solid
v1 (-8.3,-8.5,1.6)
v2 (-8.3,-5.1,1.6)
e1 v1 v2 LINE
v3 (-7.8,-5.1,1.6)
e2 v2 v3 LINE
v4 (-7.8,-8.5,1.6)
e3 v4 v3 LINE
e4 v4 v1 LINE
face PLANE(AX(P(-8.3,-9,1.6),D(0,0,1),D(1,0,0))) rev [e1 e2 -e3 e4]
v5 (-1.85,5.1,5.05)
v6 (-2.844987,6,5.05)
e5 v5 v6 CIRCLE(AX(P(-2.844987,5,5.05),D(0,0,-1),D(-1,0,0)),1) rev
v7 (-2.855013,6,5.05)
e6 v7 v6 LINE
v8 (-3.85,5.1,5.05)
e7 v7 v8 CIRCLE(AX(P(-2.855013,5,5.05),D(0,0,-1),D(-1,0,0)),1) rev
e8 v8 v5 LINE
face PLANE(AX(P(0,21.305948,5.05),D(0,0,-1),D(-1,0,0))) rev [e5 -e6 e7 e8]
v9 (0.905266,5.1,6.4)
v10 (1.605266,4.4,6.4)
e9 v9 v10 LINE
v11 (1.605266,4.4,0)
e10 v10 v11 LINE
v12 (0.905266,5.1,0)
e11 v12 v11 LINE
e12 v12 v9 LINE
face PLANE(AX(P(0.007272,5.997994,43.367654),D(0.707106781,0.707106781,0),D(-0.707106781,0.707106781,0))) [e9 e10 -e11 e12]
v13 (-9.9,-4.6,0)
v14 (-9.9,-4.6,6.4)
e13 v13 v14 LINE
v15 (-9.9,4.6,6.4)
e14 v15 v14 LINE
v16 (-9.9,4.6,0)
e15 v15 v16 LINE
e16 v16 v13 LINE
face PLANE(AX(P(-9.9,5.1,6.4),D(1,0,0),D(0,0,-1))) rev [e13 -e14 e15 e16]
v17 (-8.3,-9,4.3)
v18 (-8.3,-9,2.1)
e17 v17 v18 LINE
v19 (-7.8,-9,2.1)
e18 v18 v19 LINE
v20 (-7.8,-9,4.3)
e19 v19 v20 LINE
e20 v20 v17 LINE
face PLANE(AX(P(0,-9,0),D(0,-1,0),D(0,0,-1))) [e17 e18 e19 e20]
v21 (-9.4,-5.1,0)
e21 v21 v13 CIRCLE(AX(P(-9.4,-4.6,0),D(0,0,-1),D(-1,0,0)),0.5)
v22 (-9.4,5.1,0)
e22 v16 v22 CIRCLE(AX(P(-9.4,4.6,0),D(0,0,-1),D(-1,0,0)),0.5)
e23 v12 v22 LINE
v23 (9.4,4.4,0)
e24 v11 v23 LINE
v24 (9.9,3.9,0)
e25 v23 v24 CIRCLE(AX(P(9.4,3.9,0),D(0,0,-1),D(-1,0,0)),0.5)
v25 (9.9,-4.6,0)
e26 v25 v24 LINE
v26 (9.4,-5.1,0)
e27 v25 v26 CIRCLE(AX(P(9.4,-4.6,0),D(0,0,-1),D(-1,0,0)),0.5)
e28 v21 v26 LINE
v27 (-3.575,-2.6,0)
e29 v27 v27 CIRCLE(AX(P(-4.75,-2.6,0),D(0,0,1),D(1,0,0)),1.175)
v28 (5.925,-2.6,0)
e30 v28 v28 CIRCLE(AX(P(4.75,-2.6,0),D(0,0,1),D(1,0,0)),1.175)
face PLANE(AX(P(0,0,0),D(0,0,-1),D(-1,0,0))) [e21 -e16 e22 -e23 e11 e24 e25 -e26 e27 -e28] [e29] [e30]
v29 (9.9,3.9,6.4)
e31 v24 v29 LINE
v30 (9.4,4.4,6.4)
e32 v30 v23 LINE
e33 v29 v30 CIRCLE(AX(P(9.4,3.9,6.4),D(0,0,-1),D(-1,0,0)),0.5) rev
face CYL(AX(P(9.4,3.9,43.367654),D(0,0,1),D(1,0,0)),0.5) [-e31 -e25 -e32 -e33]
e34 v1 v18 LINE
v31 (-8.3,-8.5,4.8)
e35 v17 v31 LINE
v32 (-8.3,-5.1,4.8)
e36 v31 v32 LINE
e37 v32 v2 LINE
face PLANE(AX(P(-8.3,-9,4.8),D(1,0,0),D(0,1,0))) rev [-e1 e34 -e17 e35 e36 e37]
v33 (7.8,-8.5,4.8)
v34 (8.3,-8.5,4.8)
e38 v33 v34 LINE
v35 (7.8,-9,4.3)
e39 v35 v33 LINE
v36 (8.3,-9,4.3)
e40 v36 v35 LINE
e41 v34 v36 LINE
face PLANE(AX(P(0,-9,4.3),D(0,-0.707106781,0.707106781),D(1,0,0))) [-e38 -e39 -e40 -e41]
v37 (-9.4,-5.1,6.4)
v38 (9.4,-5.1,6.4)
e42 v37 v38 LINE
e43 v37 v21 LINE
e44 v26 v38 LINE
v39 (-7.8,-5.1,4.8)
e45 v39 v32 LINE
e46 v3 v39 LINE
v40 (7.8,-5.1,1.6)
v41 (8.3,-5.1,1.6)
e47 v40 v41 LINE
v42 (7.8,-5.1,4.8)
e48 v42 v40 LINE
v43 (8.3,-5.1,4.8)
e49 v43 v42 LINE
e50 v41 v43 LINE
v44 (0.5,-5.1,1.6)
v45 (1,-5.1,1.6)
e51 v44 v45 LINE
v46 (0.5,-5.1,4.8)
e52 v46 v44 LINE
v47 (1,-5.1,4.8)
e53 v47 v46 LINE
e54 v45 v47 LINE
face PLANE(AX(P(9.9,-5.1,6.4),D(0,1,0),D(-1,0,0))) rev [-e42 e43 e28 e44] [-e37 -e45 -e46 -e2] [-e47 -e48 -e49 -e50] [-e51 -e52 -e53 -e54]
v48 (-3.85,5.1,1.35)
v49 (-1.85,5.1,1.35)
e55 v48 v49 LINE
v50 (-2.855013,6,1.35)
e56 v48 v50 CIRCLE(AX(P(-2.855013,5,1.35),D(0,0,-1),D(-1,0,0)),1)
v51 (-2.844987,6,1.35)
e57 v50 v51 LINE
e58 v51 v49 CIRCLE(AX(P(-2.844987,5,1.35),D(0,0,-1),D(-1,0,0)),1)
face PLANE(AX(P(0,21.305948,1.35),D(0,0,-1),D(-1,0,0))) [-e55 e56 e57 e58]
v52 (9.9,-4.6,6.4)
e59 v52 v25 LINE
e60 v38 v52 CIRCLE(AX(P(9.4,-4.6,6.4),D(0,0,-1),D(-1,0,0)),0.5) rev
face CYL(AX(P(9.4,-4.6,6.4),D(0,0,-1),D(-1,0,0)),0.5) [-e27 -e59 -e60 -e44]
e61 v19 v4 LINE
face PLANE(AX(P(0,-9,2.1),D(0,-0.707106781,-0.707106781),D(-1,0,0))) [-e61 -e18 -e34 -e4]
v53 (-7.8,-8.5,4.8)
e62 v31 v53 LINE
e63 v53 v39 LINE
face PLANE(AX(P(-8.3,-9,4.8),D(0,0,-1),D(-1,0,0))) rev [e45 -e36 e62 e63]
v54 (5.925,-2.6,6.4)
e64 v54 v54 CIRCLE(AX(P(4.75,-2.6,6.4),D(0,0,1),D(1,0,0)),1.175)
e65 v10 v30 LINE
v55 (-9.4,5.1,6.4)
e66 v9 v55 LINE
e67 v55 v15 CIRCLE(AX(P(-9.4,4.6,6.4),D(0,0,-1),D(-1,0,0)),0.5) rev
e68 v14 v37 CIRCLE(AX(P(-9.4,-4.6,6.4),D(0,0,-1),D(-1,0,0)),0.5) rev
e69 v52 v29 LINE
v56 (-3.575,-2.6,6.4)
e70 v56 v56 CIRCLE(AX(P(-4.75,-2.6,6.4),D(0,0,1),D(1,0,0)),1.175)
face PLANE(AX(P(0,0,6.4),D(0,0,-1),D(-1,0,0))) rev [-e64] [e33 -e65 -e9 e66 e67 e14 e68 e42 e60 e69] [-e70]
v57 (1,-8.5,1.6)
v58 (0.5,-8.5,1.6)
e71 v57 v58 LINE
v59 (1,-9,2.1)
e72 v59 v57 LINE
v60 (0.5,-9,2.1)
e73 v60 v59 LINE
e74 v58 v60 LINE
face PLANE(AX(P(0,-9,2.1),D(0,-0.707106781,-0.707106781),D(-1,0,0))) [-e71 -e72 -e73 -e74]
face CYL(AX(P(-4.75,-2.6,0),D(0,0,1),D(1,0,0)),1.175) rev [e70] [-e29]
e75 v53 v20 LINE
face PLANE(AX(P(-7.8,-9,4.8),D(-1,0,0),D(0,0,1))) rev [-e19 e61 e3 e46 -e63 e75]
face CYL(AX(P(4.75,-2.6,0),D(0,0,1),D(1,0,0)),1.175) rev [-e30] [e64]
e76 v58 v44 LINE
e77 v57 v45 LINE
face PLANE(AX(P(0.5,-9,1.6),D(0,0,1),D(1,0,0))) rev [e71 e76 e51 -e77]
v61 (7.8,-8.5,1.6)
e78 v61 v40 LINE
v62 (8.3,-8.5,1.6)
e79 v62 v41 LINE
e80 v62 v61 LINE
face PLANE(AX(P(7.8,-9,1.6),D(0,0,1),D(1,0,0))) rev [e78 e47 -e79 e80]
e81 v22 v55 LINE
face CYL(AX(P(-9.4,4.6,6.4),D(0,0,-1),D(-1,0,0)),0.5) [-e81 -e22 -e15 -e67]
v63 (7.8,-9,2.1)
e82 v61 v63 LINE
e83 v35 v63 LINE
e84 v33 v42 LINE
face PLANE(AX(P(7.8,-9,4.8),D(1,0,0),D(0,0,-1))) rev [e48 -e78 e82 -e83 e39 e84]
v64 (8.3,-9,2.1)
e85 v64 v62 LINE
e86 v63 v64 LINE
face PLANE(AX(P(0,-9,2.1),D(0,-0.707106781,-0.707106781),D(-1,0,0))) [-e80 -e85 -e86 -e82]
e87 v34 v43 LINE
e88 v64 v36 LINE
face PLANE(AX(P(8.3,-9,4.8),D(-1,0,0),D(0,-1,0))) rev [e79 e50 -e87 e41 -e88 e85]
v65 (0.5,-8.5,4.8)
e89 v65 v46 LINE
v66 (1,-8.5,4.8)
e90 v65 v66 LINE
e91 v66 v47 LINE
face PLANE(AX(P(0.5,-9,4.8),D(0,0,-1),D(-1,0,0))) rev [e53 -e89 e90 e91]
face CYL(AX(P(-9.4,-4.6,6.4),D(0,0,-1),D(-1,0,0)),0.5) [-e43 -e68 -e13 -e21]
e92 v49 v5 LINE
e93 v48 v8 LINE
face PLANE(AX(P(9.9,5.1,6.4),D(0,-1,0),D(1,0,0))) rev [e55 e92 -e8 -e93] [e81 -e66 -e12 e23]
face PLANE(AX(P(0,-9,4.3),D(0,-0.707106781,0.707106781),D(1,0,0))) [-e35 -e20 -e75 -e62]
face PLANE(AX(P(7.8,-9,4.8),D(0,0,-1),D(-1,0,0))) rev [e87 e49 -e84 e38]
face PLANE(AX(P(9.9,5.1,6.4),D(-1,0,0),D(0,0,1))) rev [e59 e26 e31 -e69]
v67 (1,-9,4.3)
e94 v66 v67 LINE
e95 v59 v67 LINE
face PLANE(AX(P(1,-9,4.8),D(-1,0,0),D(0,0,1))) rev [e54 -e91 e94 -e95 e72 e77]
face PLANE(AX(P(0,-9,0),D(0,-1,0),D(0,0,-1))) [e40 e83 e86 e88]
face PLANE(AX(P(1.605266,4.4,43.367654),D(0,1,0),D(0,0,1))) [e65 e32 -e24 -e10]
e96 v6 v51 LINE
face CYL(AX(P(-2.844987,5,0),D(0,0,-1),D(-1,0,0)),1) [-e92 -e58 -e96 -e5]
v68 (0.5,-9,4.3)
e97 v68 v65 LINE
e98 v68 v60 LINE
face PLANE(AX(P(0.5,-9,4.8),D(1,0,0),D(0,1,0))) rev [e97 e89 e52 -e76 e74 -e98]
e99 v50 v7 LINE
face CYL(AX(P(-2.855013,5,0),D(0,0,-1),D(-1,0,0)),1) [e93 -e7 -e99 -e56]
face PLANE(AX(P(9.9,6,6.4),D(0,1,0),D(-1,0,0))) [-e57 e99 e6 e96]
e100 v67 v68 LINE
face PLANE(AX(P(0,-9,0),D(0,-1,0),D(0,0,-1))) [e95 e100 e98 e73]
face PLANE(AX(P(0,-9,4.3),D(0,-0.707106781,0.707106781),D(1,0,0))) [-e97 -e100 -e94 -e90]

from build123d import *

# Parameters (mm, degrees)
SKETCH_1_W               = 19.8
SKETCH_1_H               = 10.2
EXTRUDE_1_DEPTH          = 6.4
CUT_EXTRUDE_1_DEPTH      = 13.844454056
CUT_EXTRUDE_1_DEPTH_BACK = 13.844454056
SKETCH_3_R               = 1.175
CUT_EXTRUDE_2_DEPTH      = 13.844454056
SKETCH_4_W               = 2
SKETCH_4_H               = 3.7
EXTRUDE_2_DEPTH          = 0.9
FILLET_2_R               = 0.5
FILLET_3_R               = 1
SKETCH_6_W               = 0.5
SKETCH_6_H               = 3.2
EXTRUDE_3_DEPTH          = 3.9
CHAMFER_1_SIZE           = 0.5


with BuildPart() as part:
    # 草图1 → 凸台-拉伸1 (new body)
    with BuildSketch(Plane.XY):
        Rectangle(SKETCH_1_W, SKETCH_1_H)
    extrude(amount=EXTRUDE_1_DEPTH)

    # 草图2 → 切除-拉伸1 (cut, two sides: drawn at the far end of the back side and taken through both)
    with BuildSketch(Plane.XY.offset(6.4).offset(-CUT_EXTRUDE_1_DEPTH_BACK)):
        Polygon((9.9, 5.1), (0.905266145, 5.1), (1.605266145, 4.4), (9.9, 4.4), align=None)
    extrude(amount=CUT_EXTRUDE_1_DEPTH + CUT_EXTRUDE_1_DEPTH_BACK, mode=Mode.SUBTRACT)

    # 草图3 → 切除-拉伸2 (cut, through all)
    with BuildSketch(Plane.XY.offset(6.4)):
        with Locations((-4.75, -2.6)):
            Circle(SKETCH_3_R)
        with Locations((4.75, -2.6)):
            Circle(SKETCH_3_R)
    extrude(amount=-CUT_EXTRUDE_2_DEPTH, mode=Mode.SUBTRACT)

    # 草图4 → 凸台-拉伸2 (add)
    with BuildSketch(Plane(origin=(0, 5.1, 0), x_dir=(1, 0, 0), z_dir=(0, 1, 0))):
        with Locations((-2.85, -3.2)):
            Rectangle(SKETCH_4_W, SKETCH_4_H)
    extrude(amount=EXTRUDE_2_DEPTH)

    # 圆角2
    fillet_2_edges = [part.edges().sort_by_distance(p)[0] for p in [
        (9.9, 4.4, 3.2),
        (-9.9, 5.1, 3.2),
        (9.9, -5.1, 3.2),
        (-9.9, -5.1, 3.2),
    ]]
    fillet(fillet_2_edges, radius=FILLET_2_R)

    # 圆角3
    # the kernel refuses this fillet: 1 mm, written as the material it takes off along each edge
    with BuildSketch(Plane(origin=(-1.85, 6, -1.137468593), x_dir=(0, -1, 0), z_dir=(0, 0, 1)), Plane(origin=(-3.85, 6, 7.537468593), x_dir=(0, -1, 0), z_dir=(0, 0, -1))) as fillet_3_piece_1:
        with BuildLine():
            CenterArc((1, -0.994987437), FILLET_3_R, 95.739170477, 84.260829523)
            Line((0, -0.994987437), (-0.02, -0.994987437))
            Line((-0.02, -0.994987437), (-0.02, 0))
            Line((-0.02, 0), (0, 0.02))
            ThreePointArc((0, 0.02), (0.45, 0.02), (0.898, 0.019899749))
            Line((0.898, 0.019899749), (0.9, 0))
        make_face()
    extrude(amount=8.674937186, mode=Mode.SUBTRACT)

    # 草图6 → 凸台-拉伸3 (add)
    with BuildSketch(Plane.XZ.offset(5.1)):
        with Locations((-8.05, 3.2)):
            Rectangle(SKETCH_6_W, SKETCH_6_H)
        with Locations((0.75, 3.2)):
            Rectangle(SKETCH_6_W, SKETCH_6_H)
        with Locations((8.05, 3.2)):
            Rectangle(SKETCH_6_W, SKETCH_6_H)
    extrude(amount=EXTRUDE_3_DEPTH)

    # 倒角1
    chamfer_1_edges = [part.edges().sort_by_distance(p)[0] for p in [
        (0.75, -9, 4.8),
        (0.75, -9, 1.6),
        (8.05, -9, 4.8),
        (8.05, -9, 1.6),
        (-8.05, -9, 4.8),
        (-8.05, -9, 1.6),
    ]]
    chamfer(chamfer_1_edges, length=CHAMFER_1_SIZE)


solid = part.part
